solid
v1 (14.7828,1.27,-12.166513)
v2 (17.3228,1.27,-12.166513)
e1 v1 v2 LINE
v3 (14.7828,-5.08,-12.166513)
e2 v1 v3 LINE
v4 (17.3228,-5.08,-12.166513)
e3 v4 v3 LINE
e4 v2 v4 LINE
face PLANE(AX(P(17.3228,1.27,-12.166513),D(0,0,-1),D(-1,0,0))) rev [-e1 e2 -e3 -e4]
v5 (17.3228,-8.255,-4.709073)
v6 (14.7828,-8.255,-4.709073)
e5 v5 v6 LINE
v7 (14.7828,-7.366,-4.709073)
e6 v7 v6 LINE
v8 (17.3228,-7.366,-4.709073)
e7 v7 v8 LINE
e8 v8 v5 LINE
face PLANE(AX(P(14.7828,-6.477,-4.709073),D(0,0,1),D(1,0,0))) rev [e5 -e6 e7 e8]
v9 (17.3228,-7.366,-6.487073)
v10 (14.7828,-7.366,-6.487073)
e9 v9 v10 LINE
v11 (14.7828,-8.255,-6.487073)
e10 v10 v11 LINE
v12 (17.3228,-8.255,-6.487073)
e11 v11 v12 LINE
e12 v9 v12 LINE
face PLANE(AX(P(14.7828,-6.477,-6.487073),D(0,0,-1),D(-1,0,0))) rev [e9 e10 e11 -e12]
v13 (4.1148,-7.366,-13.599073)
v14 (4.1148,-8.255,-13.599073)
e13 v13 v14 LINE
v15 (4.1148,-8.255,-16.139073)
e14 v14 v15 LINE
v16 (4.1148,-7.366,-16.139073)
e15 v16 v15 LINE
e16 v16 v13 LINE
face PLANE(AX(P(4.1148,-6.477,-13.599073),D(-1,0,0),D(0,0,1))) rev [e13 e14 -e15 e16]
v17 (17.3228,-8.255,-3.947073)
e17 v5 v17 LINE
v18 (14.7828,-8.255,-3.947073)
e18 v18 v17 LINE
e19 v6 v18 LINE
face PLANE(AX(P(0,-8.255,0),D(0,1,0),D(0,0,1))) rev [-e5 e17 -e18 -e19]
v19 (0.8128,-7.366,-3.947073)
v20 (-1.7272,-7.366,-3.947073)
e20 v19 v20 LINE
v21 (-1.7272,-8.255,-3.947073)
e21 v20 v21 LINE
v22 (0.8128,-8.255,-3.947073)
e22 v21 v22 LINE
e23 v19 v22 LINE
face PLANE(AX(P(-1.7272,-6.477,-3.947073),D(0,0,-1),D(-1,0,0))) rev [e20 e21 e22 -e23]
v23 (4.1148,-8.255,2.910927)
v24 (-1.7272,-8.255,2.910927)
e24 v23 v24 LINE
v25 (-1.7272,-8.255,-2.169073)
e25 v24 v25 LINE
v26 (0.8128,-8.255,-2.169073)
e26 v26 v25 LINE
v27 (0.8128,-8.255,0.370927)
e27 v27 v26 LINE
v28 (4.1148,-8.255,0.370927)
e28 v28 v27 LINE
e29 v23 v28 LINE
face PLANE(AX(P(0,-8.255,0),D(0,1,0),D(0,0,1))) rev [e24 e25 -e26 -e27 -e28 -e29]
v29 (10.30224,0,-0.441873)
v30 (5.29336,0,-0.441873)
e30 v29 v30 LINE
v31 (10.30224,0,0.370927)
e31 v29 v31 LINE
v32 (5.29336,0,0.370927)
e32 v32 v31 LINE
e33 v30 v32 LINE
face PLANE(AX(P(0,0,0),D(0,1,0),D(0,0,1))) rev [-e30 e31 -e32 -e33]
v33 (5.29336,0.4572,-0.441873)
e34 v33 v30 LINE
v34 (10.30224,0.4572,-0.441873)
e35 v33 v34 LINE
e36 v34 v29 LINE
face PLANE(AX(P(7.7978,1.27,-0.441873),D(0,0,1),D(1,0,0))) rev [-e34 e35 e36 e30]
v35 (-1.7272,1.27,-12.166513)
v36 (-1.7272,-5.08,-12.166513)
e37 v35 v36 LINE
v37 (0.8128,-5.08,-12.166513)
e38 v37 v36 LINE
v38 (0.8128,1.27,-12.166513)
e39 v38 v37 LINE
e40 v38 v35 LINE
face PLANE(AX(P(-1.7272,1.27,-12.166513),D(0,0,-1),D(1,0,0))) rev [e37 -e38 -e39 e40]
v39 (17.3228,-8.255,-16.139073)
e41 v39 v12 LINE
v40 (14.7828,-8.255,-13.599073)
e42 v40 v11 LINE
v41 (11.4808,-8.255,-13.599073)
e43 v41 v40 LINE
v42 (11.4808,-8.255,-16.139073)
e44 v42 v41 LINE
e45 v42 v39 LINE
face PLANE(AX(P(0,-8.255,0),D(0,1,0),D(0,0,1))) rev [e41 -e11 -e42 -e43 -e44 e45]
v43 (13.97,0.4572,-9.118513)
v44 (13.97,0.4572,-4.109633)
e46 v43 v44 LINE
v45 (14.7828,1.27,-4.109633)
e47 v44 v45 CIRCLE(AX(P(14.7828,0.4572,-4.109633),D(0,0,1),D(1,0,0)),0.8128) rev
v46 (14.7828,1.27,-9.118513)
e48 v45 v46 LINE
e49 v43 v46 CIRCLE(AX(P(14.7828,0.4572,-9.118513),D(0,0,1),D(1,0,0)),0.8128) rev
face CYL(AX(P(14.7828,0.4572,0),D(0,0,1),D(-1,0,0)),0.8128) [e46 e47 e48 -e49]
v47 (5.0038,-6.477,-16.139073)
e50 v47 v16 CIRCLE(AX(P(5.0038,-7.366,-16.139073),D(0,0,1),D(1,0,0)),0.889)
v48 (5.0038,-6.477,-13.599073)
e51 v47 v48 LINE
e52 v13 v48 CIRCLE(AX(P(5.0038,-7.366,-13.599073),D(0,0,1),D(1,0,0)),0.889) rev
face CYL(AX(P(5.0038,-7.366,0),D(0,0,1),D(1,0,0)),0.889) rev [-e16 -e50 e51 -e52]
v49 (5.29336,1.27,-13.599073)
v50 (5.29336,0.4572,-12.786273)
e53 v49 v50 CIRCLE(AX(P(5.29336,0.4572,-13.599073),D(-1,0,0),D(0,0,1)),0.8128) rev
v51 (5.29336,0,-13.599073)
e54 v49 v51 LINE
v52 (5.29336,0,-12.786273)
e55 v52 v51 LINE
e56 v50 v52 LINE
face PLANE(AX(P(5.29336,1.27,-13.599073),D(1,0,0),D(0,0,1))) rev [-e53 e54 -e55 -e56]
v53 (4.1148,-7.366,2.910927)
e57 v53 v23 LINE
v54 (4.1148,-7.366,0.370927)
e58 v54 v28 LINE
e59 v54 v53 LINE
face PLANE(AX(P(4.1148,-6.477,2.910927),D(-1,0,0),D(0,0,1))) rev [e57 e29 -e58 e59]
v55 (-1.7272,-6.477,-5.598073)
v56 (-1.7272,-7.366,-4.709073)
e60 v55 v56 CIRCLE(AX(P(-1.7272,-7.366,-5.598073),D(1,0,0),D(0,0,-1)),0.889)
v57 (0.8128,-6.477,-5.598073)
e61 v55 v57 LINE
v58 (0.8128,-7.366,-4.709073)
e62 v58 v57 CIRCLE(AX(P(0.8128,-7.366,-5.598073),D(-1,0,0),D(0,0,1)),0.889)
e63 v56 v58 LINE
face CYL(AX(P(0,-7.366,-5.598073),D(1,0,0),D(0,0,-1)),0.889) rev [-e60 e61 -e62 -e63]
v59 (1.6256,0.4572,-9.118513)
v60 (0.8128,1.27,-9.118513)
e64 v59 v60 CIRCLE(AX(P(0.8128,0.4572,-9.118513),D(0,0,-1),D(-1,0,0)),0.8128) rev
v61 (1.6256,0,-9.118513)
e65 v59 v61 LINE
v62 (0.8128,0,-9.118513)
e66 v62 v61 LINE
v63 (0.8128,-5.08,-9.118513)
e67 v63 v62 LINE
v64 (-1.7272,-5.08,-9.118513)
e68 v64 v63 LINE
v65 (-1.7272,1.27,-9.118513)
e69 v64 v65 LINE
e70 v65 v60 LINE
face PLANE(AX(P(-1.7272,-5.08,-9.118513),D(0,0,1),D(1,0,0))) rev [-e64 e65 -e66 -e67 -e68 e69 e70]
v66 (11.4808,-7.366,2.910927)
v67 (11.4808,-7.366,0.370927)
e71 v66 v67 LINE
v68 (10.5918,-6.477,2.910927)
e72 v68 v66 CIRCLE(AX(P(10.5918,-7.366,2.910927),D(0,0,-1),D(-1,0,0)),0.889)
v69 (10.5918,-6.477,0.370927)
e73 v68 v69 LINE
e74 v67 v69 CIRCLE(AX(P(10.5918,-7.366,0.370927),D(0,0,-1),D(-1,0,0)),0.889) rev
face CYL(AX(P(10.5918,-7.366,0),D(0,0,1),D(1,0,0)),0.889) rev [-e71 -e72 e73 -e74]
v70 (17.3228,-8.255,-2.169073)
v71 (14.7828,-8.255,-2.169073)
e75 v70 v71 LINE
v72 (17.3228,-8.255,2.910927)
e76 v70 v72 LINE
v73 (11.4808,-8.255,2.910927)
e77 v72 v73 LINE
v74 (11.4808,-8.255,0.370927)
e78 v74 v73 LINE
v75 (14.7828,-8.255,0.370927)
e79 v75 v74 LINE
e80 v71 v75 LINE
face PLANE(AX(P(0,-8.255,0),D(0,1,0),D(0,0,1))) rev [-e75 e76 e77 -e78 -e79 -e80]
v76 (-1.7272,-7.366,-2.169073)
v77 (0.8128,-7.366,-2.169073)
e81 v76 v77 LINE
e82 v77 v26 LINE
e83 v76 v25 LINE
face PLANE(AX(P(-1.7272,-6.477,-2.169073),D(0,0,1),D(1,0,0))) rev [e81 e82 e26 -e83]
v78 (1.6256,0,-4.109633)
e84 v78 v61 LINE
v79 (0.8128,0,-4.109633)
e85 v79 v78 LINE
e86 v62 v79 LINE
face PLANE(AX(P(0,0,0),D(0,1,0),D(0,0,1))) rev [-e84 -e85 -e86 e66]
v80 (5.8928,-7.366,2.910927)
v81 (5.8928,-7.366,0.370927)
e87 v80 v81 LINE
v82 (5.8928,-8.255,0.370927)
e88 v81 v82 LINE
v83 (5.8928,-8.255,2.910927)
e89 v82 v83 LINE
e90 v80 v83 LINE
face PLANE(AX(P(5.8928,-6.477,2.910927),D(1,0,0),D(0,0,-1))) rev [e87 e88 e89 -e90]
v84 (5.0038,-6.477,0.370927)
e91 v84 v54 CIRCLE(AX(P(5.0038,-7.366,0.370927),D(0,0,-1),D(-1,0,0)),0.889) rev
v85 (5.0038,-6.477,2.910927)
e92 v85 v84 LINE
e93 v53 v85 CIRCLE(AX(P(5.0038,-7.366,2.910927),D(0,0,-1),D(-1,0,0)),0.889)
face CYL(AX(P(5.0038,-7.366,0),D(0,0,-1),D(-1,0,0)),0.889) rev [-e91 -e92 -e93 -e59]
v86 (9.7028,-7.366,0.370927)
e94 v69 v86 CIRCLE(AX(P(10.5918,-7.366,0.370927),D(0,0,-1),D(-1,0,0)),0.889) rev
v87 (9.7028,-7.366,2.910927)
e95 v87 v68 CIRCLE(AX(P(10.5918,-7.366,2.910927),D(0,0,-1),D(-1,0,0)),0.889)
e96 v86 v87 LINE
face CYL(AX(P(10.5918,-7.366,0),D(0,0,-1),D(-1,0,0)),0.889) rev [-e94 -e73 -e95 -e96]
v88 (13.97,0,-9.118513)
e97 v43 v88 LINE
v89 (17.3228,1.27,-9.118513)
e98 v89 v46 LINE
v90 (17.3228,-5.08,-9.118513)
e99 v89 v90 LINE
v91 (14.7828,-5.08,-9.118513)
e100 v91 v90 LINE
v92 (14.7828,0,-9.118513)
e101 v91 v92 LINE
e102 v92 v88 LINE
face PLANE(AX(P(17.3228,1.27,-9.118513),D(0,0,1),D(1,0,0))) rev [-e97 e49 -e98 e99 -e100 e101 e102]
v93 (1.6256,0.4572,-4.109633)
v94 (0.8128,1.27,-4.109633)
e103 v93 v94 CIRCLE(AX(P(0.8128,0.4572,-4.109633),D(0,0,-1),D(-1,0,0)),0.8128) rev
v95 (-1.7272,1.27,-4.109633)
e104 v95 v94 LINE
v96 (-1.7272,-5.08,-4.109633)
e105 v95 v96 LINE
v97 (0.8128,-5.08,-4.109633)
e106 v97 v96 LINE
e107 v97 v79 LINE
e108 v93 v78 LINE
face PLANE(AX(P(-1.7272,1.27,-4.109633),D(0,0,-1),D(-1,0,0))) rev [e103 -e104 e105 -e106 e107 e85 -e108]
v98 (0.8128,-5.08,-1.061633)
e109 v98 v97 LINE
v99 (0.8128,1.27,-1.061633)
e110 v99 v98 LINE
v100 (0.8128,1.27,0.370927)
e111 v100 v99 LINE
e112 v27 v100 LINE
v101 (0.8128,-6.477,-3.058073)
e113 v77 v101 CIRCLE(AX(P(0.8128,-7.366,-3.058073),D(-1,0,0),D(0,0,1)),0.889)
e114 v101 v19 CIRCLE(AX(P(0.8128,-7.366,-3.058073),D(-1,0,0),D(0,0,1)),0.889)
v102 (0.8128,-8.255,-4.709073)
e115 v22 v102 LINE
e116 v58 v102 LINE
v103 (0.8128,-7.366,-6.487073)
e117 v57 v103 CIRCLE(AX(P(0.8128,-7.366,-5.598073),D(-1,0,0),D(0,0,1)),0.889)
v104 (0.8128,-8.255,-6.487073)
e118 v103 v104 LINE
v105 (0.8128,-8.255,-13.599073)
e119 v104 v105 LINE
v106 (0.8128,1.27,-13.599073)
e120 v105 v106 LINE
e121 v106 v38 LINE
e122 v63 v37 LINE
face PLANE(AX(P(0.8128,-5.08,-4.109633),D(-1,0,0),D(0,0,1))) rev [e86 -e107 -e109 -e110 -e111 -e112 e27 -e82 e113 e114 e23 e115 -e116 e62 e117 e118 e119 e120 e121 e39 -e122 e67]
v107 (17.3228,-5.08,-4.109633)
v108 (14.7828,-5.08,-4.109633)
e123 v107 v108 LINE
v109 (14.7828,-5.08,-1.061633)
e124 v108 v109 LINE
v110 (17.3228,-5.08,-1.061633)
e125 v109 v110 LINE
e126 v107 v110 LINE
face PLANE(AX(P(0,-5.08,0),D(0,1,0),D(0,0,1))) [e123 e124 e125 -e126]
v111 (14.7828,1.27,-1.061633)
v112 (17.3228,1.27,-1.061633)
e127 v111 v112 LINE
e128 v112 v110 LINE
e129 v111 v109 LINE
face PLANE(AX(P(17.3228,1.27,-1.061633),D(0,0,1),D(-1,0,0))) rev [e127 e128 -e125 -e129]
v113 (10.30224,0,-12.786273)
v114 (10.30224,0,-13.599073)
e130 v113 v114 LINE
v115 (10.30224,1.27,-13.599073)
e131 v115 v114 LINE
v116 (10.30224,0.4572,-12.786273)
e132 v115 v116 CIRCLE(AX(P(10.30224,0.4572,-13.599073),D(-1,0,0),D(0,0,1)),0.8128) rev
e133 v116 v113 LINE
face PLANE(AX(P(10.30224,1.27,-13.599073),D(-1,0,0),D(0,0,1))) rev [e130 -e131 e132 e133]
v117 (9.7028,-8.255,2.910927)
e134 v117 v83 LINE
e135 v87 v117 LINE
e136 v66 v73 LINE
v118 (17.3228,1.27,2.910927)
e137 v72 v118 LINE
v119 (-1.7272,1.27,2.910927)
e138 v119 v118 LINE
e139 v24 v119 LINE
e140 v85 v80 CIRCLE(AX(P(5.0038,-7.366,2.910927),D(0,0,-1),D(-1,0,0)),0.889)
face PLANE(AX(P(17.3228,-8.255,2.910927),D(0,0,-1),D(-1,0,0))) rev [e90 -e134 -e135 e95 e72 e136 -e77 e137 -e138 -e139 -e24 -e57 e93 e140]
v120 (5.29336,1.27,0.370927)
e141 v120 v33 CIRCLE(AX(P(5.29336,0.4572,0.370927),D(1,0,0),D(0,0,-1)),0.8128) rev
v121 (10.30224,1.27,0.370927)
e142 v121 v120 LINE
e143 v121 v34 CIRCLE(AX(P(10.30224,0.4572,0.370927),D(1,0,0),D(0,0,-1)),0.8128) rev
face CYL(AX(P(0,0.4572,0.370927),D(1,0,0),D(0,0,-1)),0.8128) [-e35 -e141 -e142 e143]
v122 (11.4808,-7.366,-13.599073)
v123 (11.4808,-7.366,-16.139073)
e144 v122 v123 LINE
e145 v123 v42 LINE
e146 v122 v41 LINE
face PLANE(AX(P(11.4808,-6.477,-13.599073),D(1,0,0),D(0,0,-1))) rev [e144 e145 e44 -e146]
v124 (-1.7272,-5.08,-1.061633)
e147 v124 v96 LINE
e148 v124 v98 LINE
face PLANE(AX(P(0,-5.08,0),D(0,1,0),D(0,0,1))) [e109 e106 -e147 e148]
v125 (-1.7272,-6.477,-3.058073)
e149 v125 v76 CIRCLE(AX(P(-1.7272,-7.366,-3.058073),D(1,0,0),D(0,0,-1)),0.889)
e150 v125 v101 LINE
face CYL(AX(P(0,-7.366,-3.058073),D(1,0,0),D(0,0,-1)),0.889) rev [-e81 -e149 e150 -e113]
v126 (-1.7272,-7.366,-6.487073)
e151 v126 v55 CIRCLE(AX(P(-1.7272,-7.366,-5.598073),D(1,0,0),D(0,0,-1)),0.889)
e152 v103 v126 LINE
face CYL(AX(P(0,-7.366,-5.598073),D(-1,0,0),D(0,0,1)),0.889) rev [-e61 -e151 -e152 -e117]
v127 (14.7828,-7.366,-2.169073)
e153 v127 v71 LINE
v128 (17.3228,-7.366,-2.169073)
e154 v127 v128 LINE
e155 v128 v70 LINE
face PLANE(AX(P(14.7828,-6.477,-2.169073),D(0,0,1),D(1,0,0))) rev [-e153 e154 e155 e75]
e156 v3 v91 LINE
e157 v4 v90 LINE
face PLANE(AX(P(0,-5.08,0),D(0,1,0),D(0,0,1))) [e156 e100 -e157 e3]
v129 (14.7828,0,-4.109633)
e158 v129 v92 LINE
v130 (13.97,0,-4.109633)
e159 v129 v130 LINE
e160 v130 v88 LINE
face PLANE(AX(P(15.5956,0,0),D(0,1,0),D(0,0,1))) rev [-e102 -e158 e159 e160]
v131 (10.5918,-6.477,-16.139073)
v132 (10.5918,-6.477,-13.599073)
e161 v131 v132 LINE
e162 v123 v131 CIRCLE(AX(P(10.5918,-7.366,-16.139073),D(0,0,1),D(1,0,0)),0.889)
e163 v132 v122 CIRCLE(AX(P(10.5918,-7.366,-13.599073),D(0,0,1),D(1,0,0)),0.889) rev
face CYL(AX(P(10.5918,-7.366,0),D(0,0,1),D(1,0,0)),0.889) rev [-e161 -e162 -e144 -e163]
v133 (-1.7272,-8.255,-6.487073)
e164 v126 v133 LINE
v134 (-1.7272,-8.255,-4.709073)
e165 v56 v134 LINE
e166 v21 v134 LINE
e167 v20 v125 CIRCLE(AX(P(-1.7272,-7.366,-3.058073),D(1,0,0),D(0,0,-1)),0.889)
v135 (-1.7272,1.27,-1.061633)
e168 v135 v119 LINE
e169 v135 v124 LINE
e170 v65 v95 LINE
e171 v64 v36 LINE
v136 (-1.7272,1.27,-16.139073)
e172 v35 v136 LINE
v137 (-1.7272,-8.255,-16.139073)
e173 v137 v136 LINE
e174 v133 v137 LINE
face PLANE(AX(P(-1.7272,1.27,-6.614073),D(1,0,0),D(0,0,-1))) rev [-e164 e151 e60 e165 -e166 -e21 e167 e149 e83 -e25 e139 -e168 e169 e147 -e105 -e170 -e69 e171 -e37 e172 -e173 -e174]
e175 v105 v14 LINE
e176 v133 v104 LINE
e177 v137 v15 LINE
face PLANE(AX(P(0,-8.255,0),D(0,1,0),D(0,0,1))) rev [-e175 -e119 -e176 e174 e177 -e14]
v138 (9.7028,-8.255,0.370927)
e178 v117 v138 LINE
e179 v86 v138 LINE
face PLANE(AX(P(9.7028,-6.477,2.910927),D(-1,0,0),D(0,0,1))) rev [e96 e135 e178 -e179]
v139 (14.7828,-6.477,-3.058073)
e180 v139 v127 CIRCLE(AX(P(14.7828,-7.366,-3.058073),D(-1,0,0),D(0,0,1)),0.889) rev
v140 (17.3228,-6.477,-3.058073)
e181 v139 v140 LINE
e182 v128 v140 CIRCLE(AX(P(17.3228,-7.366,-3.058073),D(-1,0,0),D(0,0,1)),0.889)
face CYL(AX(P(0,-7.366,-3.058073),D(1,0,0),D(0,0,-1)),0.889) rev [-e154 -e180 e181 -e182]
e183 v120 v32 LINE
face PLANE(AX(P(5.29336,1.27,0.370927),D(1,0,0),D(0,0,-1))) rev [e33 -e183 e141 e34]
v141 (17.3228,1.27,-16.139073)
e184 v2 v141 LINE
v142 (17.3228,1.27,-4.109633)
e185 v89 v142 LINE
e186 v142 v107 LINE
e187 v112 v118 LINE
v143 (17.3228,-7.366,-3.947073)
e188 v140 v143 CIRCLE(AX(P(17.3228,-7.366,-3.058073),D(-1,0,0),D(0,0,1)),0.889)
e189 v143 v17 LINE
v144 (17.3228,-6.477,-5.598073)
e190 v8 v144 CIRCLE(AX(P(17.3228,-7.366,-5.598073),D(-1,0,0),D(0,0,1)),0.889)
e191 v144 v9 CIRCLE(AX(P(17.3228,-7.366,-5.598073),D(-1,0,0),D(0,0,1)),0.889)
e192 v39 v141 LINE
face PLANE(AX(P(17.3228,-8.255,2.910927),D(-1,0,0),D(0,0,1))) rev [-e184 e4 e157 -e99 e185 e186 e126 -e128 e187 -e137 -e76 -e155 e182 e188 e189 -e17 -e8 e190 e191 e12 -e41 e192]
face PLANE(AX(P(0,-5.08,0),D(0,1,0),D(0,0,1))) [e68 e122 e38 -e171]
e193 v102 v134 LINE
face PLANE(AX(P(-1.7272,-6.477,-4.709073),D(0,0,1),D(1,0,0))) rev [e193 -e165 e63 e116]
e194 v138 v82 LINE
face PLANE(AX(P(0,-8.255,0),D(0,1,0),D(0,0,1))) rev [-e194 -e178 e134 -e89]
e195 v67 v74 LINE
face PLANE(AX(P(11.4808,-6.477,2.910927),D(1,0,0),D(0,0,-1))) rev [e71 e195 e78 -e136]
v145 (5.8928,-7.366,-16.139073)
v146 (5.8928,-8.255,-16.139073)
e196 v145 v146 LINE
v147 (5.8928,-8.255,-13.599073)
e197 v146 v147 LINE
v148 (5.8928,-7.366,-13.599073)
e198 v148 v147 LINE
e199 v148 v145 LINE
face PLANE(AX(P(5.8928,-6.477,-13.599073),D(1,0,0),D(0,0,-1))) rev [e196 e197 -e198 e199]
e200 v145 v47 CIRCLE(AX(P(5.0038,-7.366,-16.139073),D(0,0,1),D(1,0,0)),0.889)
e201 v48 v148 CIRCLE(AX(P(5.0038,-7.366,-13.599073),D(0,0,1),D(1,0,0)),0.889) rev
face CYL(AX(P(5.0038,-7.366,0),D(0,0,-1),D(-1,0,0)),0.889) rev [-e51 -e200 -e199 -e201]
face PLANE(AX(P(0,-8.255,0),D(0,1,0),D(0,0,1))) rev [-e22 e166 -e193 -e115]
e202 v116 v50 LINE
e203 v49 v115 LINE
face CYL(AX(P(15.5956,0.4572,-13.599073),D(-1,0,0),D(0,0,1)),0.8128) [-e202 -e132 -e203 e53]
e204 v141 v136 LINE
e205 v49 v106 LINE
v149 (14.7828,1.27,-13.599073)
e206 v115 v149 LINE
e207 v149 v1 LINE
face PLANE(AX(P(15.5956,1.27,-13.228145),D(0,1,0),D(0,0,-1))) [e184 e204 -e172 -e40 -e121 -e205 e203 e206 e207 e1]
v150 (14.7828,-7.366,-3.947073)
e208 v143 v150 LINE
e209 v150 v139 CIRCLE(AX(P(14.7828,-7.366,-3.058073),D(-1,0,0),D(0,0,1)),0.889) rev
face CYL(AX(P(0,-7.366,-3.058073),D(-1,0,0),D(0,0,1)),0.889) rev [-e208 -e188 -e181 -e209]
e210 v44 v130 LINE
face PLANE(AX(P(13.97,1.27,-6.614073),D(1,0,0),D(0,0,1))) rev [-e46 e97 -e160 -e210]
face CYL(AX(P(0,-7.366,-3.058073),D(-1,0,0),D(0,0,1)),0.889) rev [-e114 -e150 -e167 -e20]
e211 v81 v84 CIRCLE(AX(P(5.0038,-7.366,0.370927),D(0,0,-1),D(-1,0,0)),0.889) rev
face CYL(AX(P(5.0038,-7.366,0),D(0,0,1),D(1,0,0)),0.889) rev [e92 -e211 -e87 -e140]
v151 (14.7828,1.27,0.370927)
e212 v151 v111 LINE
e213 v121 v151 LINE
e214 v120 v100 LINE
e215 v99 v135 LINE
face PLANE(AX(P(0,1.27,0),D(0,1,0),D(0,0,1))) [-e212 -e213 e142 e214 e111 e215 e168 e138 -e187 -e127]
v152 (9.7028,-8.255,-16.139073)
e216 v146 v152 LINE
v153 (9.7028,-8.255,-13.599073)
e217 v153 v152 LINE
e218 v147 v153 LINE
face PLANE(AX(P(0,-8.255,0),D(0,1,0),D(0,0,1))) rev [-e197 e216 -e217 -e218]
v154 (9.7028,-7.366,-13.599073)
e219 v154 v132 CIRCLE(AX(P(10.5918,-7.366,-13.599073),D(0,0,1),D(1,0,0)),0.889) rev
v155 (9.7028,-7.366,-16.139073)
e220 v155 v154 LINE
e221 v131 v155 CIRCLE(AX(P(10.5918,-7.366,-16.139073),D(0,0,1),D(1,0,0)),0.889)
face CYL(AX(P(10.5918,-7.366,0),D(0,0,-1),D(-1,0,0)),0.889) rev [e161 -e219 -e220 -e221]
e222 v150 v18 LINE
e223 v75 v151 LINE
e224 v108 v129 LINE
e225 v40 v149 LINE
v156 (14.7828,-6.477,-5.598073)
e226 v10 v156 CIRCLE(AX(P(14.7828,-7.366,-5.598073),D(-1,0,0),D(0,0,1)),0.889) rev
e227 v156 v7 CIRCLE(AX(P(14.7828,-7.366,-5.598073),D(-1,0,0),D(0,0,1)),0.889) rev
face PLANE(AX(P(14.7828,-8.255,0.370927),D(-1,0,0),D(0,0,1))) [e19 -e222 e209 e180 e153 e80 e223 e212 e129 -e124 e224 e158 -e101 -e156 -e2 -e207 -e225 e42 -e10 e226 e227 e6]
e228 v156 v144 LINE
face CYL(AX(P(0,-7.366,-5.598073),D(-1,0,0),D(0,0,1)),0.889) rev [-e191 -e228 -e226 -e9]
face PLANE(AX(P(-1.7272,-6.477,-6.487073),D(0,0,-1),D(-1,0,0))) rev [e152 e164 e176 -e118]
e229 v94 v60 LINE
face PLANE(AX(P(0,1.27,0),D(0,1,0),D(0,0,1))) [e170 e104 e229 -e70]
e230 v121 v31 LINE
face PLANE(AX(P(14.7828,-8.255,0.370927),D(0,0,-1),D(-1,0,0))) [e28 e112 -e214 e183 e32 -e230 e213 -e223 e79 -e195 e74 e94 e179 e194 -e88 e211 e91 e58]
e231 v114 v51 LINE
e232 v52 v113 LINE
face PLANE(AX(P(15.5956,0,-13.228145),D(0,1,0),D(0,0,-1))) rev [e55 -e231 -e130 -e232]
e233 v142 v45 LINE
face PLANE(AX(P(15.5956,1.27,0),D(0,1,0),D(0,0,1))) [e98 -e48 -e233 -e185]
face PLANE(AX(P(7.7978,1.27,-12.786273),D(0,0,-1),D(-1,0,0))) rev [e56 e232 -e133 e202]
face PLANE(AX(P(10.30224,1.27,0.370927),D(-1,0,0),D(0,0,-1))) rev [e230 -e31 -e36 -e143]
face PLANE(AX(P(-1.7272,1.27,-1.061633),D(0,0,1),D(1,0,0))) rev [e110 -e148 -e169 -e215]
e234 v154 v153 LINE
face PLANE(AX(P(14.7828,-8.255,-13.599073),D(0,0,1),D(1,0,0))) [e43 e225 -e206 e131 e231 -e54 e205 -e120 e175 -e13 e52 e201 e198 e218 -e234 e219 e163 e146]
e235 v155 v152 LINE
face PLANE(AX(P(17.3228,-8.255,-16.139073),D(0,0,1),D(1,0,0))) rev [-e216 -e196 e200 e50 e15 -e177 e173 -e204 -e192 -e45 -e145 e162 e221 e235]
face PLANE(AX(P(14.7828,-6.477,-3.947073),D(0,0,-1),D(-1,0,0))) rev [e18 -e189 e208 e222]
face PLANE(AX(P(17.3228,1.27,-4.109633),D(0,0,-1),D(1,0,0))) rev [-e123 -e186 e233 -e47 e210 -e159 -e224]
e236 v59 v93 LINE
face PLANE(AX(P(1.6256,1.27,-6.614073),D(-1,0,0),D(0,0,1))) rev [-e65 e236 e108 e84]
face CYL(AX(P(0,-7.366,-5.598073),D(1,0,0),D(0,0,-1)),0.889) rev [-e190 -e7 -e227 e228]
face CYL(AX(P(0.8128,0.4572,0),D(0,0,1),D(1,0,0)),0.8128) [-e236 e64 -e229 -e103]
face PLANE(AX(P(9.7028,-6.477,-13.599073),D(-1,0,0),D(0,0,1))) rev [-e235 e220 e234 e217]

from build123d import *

# Parameters (mm, degrees)
BOSS_EXTRUDE1_DEPTH   = 1.27
SKETCH1_W             = 3.3528
SKETCH1_H             = 2.50444
BOSS_EXTRUDE1_2_DEPTH = 1.27
FILLET3_R             = 0.8128
FILLET4_R             = 0.8128
SKETCH5_W             = 2.54
SKETCH5_H             = 5.00888
BOSS_EXTRUDE3_DEPTH   = 5.08
SKETCH6_W             = 19.05
SKETCH6_H             = 19.05
SKETCH6_W_2           = 13.97
SKETCH6_H_2           = 13.97
BOSS_EXTRUDE4_DEPTH   = 3.175
SKETCH7_W             = 2.54
SKETCH7_H             = 1.778
SKETCH7_W_2           = 1.778
SKETCH7_H_2           = 2.54
CUT_EXTRUDE2_DEPTH    = 1.778
FILLET6_R             = 0.889


with BuildPart() as part:
    # Sketch1 → Boss-Extrude1 (new body)
    with BuildSketch(Plane(origin=(0, 0, 0), x_dir=(1, 0, 0), z_dir=(0, 1, 0))):
        Polygon((0.8128, 1.061632718), (0.8128, -0.370927282), (5.29336, -0.370927282), (5.29336, 0.441872718), (7.7978, 0.441872718), (7.7978, -2.910927282), (-1.7272, -2.910927282), (-1.7272, 1.061632718), align=None)
    extrude(amount=BOSS_EXTRUDE1_DEPTH)

    # Fillet3
    fillet3_edges = [part.edges().sort_by_distance(p)[0] for p in [
        (6.54558, 1.27, -0.441872718),
    ]]
    fillet(fillet3_edges, radius=FILLET3_R)


with BuildPart() as body_2:
    # Sketch1 → Boss-Extrude1 2 (new body)
    with BuildSketch(Plane(origin=(0, 0, 0), x_dir=(1, 0, 0), z_dir=(0, 1, 0))):
        with Locations((-0.0508, 5.361852718)):
            Rectangle(SKETCH1_W, SKETCH1_H)
    extrude(amount=BOSS_EXTRUDE1_2_DEPTH)

    # Fillet4
    fillet4_edges = [body_2.edges().sort_by_distance(p)[0] for p in [
        (1.6256, 1.27, -5.361852718),
    ]]
    fillet(fillet4_edges, radius=FILLET4_R)


with BuildPart() as body_3:
    # Mirror6: mirrored copy
    add(part.part.mirror(Plane(origin=(7.7978, 1.27, -0.441872718), x_dir=(0, 0, 1), z_dir=(-1, 0, 0))))


with BuildPart() as body_4:
    # Mirror6 2: mirrored copy
    add(body_2.part.mirror(Plane(origin=(7.7978, 1.27, -0.441872718), x_dir=(0, 0, 1), z_dir=(-1, 0, 0))))


with BuildPart() as body_5:
    # Mirror7: mirrored copy
    add(body_3.part.mirror(Plane(origin=(17.3228, 1.27, -6.614072718), x_dir=(1, 0, 0), z_dir=(0, 0, 1))))


with BuildPart() as body_6:
    # Mirror7 2: mirrored copy
    add(body_4.part.mirror(Plane(origin=(17.3228, 1.27, -6.614072718), x_dir=(1, 0, 0), z_dir=(0, 0, 1))))


with BuildPart() as body_7:
    # Mirror8: mirrored copy
    add(body_5.part.mirror(Plane(origin=(7.7978, 1.27, -12.786272718), x_dir=(0, 0, 1), z_dir=(1, 0, 0))))


with BuildPart() as body_8:
    # Mirror8 2: mirrored copy
    add(body_6.part.mirror(Plane(origin=(7.7978, 1.27, -12.786272718), x_dir=(0, 0, 1), z_dir=(1, 0, 0))))


with BuildPart() as part_1:
    add(part.part)

    add(body_2.part)  # Boss-Extrude3 merges body 2

    add(body_3.part)  # Boss-Extrude3 merges body 3

    add(body_4.part)  # Boss-Extrude3 merges body 4

    add(body_5.part)  # Boss-Extrude3 merges body 5

    add(body_6.part)  # Boss-Extrude3 merges body 6

    add(body_7.part)  # Boss-Extrude3 merges body 7

    add(body_8.part)  # Boss-Extrude3 merges body 8
    # Sketch5 → Boss-Extrude3 (add)
    with BuildSketch(Plane.XZ):
        Polygon((17.3228, -1.061632718), (14.7828, -1.061632718), (14.7828, 0.370927282), (0.8128, 0.370927282), (0.8128, -1.061632718), (-1.7272, -1.061632718), (-1.7272, 2.910927282), (17.3228, 2.910927282), align=None)
        Polygon((17.3228, -16.139072718), (-1.7272, -16.139072718), (-1.7272, -12.166512718), (0.8128, -12.166512718), (0.8128, -13.599072718), (14.7828, -13.599072718), (14.7828, -12.166512718), (17.3228, -12.166512718), align=None)
        with Locations((16.0528, -6.614072718)):
            Rectangle(SKETCH5_W, SKETCH5_H)
        with Locations((-0.4572, -6.614072718)):
            Rectangle(SKETCH5_W, SKETCH5_H)
    extrude(amount=BOSS_EXTRUDE3_DEPTH)

    # Sketch6 → Boss-Extrude4 (add)
    with BuildSketch(Plane.XZ.offset(5.08)):
        with Locations((7.7978, -6.614072718)):
            Rectangle(SKETCH6_W, SKETCH6_H)
        with Locations((7.7978, -6.614072718)):
            Rectangle(SKETCH6_W_2, SKETCH6_H_2, mode=Mode.SUBTRACT)
    extrude(amount=BOSS_EXTRUDE4_DEPTH)

    # Sketch7 → Cut-Extrude2 (cut)
    with BuildSketch(Plane.XZ.offset(8.255)):
        with Locations((-0.4572, -5.598072718)):
            Rectangle(SKETCH7_W, SKETCH7_H)
        with Locations((-0.4572, -3.058072718)):
            Rectangle(SKETCH7_W, SKETCH7_H)
        with Locations((10.5918, 1.640927282)):
            Rectangle(SKETCH7_W_2, SKETCH7_H_2)
        with Locations((5.0038, 1.640927282)):
            Rectangle(SKETCH7_W_2, SKETCH7_H_2)
        with Locations((10.5918, -14.869072718)):
            Rectangle(SKETCH7_W_2, SKETCH7_H_2)
        with Locations((5.0038, -14.869072718)):
            Rectangle(SKETCH7_W_2, SKETCH7_H_2)
        with Locations((16.0528, -5.598072718)):
            Rectangle(SKETCH7_W, SKETCH7_H)
        with Locations((16.0528, -3.058072718)):
            Rectangle(SKETCH7_W, SKETCH7_H)
    extrude(amount=-CUT_EXTRUDE2_DEPTH, mode=Mode.SUBTRACT)

    # Fillet6
    fillet6_edges = [part_1.edges().sort_by_distance(p)[0] for p in [
        (-0.4572, -6.477, -4.709072718),
        (16.0528, -6.477, -4.709072718),
        (11.4808, -6.477, 1.640927282),
        (5.8928, -6.477, 1.640927282),
        (9.7028, -6.477, 1.640927282),
        (4.1148, -6.477, 1.640927282),
        (-0.4572, -6.477, -2.169072718),
        (16.0528, -6.477, -2.169072718),
        (-0.4572, -6.477, -6.487072718),
        (-0.4572, -6.477, -3.947072718),
        (16.0528, -6.477, -3.947072718),
        (16.0528, -6.477, -6.487072718),
        (4.1148, -6.477, -14.869072718),
        (9.7028, -6.477, -14.869072718),
        (5.8928, -6.477, -14.869072718),
        (11.4808, -6.477, -14.869072718),
    ]]
    fillet(fillet6_edges, radius=FILLET6_R - 0.0001)  # a hair under: the kernel refuses the full size


solid = part_1.part
